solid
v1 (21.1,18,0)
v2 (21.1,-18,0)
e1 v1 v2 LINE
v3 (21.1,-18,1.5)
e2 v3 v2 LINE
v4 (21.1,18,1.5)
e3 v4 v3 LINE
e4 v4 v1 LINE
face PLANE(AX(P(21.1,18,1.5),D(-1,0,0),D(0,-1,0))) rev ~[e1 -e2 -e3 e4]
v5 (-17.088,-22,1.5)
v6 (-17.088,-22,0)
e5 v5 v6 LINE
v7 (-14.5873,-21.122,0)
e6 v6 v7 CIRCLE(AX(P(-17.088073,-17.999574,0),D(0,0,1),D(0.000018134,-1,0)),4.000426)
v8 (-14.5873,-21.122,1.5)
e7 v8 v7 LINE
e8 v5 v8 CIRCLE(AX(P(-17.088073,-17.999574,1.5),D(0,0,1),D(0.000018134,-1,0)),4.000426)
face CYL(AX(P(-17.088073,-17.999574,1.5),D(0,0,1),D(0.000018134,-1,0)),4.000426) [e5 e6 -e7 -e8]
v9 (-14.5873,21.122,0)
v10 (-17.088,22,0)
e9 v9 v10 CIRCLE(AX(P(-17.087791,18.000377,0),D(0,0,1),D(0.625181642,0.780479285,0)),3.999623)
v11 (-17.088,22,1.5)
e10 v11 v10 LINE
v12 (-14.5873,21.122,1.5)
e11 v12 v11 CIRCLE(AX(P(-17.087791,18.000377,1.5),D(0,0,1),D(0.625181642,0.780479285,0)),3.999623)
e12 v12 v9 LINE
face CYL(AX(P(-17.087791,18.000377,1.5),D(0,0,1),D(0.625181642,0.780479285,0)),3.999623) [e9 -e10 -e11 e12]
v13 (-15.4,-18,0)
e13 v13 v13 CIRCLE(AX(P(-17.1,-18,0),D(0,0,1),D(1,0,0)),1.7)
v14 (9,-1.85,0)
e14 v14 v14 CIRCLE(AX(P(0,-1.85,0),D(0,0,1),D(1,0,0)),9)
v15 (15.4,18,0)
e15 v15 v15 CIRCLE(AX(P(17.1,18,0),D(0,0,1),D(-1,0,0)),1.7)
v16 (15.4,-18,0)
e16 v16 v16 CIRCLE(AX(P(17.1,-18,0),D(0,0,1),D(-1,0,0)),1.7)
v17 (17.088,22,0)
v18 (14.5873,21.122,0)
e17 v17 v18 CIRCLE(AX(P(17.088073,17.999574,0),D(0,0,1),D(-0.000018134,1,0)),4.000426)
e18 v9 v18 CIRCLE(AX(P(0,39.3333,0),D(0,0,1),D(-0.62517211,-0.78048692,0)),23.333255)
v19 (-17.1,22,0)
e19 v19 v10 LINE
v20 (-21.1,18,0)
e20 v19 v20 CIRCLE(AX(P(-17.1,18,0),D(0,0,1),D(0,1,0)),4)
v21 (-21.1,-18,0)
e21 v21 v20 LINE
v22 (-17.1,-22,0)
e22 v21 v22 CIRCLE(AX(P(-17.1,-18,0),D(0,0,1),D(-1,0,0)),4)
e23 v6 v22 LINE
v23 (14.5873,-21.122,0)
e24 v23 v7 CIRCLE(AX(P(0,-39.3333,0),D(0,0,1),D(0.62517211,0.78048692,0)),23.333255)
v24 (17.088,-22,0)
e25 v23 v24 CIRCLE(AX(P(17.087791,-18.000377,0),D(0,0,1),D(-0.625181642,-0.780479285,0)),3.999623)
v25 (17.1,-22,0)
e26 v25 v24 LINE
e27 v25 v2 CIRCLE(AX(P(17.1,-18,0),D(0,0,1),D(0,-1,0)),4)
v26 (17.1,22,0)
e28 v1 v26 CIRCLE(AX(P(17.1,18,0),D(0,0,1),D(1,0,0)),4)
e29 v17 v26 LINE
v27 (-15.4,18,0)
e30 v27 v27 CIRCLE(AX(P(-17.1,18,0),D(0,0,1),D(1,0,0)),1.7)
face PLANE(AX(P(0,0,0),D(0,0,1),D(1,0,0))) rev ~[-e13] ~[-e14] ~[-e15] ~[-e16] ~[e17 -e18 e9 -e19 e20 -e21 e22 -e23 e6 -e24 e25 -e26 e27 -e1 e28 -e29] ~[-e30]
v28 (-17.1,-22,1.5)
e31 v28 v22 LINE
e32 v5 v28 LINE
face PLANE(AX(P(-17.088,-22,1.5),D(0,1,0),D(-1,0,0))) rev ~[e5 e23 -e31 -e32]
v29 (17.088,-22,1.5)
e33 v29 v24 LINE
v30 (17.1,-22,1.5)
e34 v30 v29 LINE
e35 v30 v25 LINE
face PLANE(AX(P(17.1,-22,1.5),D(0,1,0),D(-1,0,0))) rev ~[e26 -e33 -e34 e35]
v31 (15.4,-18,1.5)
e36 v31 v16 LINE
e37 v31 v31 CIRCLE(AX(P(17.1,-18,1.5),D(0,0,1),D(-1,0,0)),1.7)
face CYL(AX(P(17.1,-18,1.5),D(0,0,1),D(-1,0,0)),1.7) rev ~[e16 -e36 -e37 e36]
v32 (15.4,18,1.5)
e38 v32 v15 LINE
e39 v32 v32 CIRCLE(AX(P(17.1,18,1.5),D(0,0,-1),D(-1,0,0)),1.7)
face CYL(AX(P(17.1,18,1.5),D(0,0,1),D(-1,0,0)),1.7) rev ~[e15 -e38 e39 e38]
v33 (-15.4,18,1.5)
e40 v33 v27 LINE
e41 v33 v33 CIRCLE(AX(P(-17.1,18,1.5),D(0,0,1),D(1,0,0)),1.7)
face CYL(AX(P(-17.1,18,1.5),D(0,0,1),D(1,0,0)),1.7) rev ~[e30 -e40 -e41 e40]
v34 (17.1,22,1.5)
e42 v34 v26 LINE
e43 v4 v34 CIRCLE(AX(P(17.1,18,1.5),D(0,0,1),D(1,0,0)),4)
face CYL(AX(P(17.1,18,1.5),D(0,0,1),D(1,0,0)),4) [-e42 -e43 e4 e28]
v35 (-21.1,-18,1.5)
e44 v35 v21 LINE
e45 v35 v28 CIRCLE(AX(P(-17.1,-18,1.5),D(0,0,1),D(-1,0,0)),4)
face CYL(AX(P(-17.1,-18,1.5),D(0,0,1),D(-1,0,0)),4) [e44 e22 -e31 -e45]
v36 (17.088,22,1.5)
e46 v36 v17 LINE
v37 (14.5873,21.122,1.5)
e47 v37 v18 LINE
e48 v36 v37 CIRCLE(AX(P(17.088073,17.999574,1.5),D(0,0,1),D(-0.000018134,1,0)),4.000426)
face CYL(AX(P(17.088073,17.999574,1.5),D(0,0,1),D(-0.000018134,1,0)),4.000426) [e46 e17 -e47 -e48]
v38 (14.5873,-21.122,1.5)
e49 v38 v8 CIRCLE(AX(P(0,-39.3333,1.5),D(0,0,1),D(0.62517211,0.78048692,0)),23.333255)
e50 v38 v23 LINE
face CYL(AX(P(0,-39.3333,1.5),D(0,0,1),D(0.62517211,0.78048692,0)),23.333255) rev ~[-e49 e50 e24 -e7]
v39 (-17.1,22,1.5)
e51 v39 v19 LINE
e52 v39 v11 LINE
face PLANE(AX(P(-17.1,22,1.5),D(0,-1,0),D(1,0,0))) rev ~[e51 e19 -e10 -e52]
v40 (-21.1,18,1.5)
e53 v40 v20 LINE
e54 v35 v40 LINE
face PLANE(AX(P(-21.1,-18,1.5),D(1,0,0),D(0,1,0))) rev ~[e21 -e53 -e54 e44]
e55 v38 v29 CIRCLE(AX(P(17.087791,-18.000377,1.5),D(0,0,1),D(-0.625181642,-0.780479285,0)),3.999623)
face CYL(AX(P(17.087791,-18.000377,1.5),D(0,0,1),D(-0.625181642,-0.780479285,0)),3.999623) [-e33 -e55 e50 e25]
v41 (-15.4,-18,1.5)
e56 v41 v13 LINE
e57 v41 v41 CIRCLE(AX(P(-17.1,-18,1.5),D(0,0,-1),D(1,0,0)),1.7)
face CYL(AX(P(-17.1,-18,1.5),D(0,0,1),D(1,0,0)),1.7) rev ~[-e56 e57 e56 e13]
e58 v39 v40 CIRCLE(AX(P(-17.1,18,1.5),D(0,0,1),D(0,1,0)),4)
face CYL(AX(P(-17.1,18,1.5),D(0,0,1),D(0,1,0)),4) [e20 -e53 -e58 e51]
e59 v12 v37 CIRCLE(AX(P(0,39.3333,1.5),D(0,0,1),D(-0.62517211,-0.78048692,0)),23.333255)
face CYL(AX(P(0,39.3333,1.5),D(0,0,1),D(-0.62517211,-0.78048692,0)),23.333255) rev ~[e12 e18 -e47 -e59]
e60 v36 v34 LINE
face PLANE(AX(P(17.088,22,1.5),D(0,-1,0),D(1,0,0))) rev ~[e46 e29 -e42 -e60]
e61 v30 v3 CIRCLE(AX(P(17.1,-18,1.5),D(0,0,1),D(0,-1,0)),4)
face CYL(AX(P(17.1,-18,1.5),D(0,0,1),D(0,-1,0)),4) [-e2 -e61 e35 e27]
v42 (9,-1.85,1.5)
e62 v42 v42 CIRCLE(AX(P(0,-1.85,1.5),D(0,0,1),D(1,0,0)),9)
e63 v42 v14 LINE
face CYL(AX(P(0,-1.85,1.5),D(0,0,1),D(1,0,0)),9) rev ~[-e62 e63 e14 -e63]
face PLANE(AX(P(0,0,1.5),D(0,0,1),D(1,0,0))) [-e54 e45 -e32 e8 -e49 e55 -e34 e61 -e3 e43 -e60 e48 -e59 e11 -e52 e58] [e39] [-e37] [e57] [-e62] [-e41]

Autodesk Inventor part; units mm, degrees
ref_plane "YZ Plane" through (0, 0, 0) normal (1, 0, 0) x (0, 1, 0)
ref_plane "XZ Plane" through (0, 0, 0) normal (0, 1, 0) x (-1, 0, 0)
ref_plane "XY Plane" through (0, 0, 0) normal (0, 0, 1) x (1, 0, 0)
sketch "Sketch3" plane through (0, 0, 0) normal (0, 0, 1) x (1, 0, 0)
  line L0 (-20.1, 21) -> (20.1, 21)
  line L1 (20.1, 21) -> (20.1, -21)
  line L2 (20.1, -21) -> (-20.1, -21)
  line L3 (-20.1, -21) -> (-20.1, 21)
  line L4 (-20.1, 21) -> (20.1, -21) construction
  line L5 (20.1, 21) -> (-20.1, -21) construction
  point P0 (0, 0)
  dimension "d24" = 40.2
  dimension "d25" = 42
extrude "Extrusion3" add sketch "Sketch3" along normal blind 1.5
sketch "Sketch4" plane through (0, 0, 1.5) normal (0, 0, 1) x (1, 0, 0)
  line L0 (20.1, 21) -> (-20.1, 21) projected
  line L1 (-20.1, 21) -> (-17.1, 21) construction
  line L2 (-17.1, 21) -> (-17.1, 18) construction
  line L3 (-17.1, 18) -> (-20.1, 18) construction
  line L4 (-20.1, 18) -> (-20.1, 21) construction
  circle A0 centre (-17.1, 18) radius 1.7
  point P0 (0, 0)
  dimension "d28" = 3
  dimension "d29" = 3
  dimension "d30" = 3.4
extrude "Extrusion4" cut sketch "Sketch4" against normal through all
fillet "Fillet2" radius 3 1 edges at (-20.1, 21, 0.75)
mirror "Mirror2" about plane through (0, 0, 0) normal (0, 1, 0) of "Fillet2", "Extrusion4"
mirror "Mirror3" about plane through (0, 0, 0) normal (1, 0, 0) of "Fillet2", "Extrusion4", "Mirror2"
sketch "Sketch5" plane through (0, 0, 1.5) normal (0, 0, 1) x (1, 0, 0)
  circle A0 centre (-17.1, 18) radius 1.7 construction
  circle A1 centre (17.1, 18) radius 1.7 construction
  line L0 (-17.1, 18) -> (17.1, 18) construction
  line L1 (17.1, 18) -> (17.1, 15) construction
  line L2 (17.1, 15) -> (-17.1, 15) construction
  line L3 (-17.1, 15) -> (-17.1, 18) construction
  arc A2 (-17.1, 21) -> (-20.1, 18) centre (-17.1, 18) ccw projected
  line L4 (-17.1, 18) -> (-17.1, 21) construction
  line L5 (17.1, 21) -> (-17.1, 21) construction
  line L6 (17.1, 18) -> (17.1, 21) construction
  arc A3 (20.1, 18) -> (17.1, 21) centre (17.1, 18) ccw construction
  line L7 (17.1, 21) -> (-17.1, 21) construction
  line L8 (-17.1, 18) -> (-17.1, 21) construction
  line L9 (-17.1, 21) -> (-16, 21) construction
  line L10 (-16, 21) -> (-16, 18) construction
  line L11 (-16, 18) -> (-17.1, 18) construction
  line L12 (17.1, 18) -> (17.1, 21) construction
  line L13 (17.1, 21) -> (16, 21) construction
  line L14 (16, 21) -> (16, 18) construction
  line L15 (16, 18) -> (17.1, 18) construction
  arc A4 (-16, 21) -> (16, 21) centre (0, 39.3333) ccw
  line L16 (-16, 21) -> (16, 21)
  point P0 (0, 0)
  point P1 (0, 15)
  dimension "d34" = 3
  dimension "d42" = 1.1
  dimension "d43" = 1.1
extrude "Extrusion5" cut sketch "Sketch5" against normal through all
mirror "Mirror4" about plane through (0, 0, 0) normal (0, 1, 0) of "Extrusion5"
fillet "Fillet3" radius 3 4 edges at (-16, 21, 0.75) (16, 21, 0.75) (16, -21, 0.75) (-16, -21, 0.75)
sketch "Sketch7" plane through (0, 0, 1.5) normal (0, 0, 1) x (1, 0, 0)
  line L0 (15.3, 7.9) -> (15.3, -11.6) construction
  line L1 (15.3, -11.6) -> (-15.4, -11.6) construction
  line L2 (-15.4, -11.6) -> (-15.4, 7.9) construction
  line L3 (-15.4, 7.9) -> (15.3, 7.9) construction
  line L4 (-17.65, -15) -> (30.6, -15) construction
  line L5 (30.6, -15) -> (30.6, 15) construction
  line L6 (30.6, 15) -> (-30.1, 15) construction
  line L7 (-30.1, 15) -> (-30.1, 10) construction
  line L8 (-17.65, 10) -> (-30.1, 10) construction
  line L9 (-17.65, 10) -> (-17.65, -15) construction
  line L10 (15.3, -11.6) -> (-15.4, 7.9) construction
  line L11 (-15.4, -11.6) -> (15.3, 7.9) construction
  line L12 (0, 0) -> (-0.05, 0) construction
  line L13 (-0.05, 0) -> (-0.05, -1.85) construction
  line L14 (-0.05, -1.85) -> (0, -1.85) construction
  line L15 (0, -1.85) -> (0, 0) construction
  circle A0 centre (0, -1.85) radius 9
  dimension "d41" = 18
extrude "Extrusion6" cut sketch "Sketch7" against normal through all
sketch "Sketch8" plane through (0, 0, 1.5) normal (0, 0, 1) x (1, 0, 0)
  circle A0 centre (0, -1.85) radius 9 projected
  arc A1 (-17.088, -21) -> (-15.2125, -20.3415) centre (-17.088, -18) ccw projected
  arc A2 (15.2125, -20.3415) -> (-15.2125, -20.3415) centre (0, -39.3333) ccw projected
  arc A3 (15.2125, -20.3415) -> (17.088, -21) centre (17.088, -18) ccw projected
  line L0 (17.088, -21) -> (17.1, -21) projected
  arc A4 (17.1, -21) -> (20.1, -18) centre (17.1, -18) ccw projected
  line L1 (20.1, -18) -> (20.1, 18) projected
  arc A5 (20.1, 18) -> (17.1, 21) centre (17.1, 18) ccw projected
  line L2 (17.1, 21) -> (17.088, 21) projected
  arc A6 (17.088, 21) -> (15.2125, 20.3415) centre (17.088, 18) ccw projected
  arc A7 (-15.2125, 20.3415) -> (15.2125, 20.3415) centre (0, 39.3333) ccw projected
  arc A8 (-15.2125, 20.3415) -> (-17.088, 21) centre (-17.088, 18) ccw projected
  line L3 (-17.088, 21) -> (-17.1, 21) projected
  arc A9 (-17.1, 21) -> (-20.1, 18) centre (-17.1, 18) ccw projected
  line L4 (-20.1, 18) -> (-20.1, -18) projected
  arc A10 (-20.1, -18) -> (-17.1, -21) centre (-17.1, -18) ccw projected
  line L5 (-17.1, -21) -> (-17.088, -21) projected
  circle A11 centre (17.1, -18) radius 1.7 projected
  circle A12 centre (17.1, 18) radius 1.7 projected
  circle A13 centre (-17.1, -18) radius 1.7 projected
  circle A14 centre (-17.1, 18) radius 1.7 projected
  line L6 (21.1, 18) -> (21.1, -18)
  arc A15 (17.1, -22) -> (21.1, -18) centre (17.1, -18) ccw
  line L7 (17.1, -22) -> (17.088, -22)
  arc A16 (14.5873, -21.122) -> (17.088, -22) centre (17.088, -18) ccw
  arc A17 (14.5873, -21.122) -> (-14.5873, -21.122) centre (0, -39.3333) ccw
  arc A18 (-17.088, -22) -> (-14.5873, -21.122) centre (-17.088, -18) ccw
  line L8 (-17.088, -22) -> (-17.1, -22)
  arc A19 (-21.1, -18) -> (-17.1, -22) centre (-17.1, -18) ccw
  line L9 (-21.1, -18) -> (-21.1, 18)
  arc A20 (-17.1, 22) -> (-21.1, 18) centre (-17.1, 18) ccw
  line L10 (-17.1, 22) -> (-17.088, 22)
  arc A21 (-14.5873, 21.122) -> (-17.088, 22) centre (-17.088, 18) ccw
  arc A22 (-14.5873, 21.122) -> (14.5873, 21.122) centre (0, 39.3333) ccw
  arc A23 (17.088, 22) -> (14.5873, 21.122) centre (17.088, 18) ccw
  line L11 (17.088, 22) -> (17.1, 22)
  arc A24 (21.1, 18) -> (17.1, 22) centre (17.1, 18) ccw
  point P0 (0, 0)
  dimension "d44" = 1
extrude "Extrusion7" add sketch "Sketch8" against normal up to surface (1.5 mm away) contours L6 A15 L7 A16 A17 A18 L8 A19 L9 A20 L10 A21 A22 A23 L11 A24
equation "\"d43\" = d42"
properties part number "seal"
